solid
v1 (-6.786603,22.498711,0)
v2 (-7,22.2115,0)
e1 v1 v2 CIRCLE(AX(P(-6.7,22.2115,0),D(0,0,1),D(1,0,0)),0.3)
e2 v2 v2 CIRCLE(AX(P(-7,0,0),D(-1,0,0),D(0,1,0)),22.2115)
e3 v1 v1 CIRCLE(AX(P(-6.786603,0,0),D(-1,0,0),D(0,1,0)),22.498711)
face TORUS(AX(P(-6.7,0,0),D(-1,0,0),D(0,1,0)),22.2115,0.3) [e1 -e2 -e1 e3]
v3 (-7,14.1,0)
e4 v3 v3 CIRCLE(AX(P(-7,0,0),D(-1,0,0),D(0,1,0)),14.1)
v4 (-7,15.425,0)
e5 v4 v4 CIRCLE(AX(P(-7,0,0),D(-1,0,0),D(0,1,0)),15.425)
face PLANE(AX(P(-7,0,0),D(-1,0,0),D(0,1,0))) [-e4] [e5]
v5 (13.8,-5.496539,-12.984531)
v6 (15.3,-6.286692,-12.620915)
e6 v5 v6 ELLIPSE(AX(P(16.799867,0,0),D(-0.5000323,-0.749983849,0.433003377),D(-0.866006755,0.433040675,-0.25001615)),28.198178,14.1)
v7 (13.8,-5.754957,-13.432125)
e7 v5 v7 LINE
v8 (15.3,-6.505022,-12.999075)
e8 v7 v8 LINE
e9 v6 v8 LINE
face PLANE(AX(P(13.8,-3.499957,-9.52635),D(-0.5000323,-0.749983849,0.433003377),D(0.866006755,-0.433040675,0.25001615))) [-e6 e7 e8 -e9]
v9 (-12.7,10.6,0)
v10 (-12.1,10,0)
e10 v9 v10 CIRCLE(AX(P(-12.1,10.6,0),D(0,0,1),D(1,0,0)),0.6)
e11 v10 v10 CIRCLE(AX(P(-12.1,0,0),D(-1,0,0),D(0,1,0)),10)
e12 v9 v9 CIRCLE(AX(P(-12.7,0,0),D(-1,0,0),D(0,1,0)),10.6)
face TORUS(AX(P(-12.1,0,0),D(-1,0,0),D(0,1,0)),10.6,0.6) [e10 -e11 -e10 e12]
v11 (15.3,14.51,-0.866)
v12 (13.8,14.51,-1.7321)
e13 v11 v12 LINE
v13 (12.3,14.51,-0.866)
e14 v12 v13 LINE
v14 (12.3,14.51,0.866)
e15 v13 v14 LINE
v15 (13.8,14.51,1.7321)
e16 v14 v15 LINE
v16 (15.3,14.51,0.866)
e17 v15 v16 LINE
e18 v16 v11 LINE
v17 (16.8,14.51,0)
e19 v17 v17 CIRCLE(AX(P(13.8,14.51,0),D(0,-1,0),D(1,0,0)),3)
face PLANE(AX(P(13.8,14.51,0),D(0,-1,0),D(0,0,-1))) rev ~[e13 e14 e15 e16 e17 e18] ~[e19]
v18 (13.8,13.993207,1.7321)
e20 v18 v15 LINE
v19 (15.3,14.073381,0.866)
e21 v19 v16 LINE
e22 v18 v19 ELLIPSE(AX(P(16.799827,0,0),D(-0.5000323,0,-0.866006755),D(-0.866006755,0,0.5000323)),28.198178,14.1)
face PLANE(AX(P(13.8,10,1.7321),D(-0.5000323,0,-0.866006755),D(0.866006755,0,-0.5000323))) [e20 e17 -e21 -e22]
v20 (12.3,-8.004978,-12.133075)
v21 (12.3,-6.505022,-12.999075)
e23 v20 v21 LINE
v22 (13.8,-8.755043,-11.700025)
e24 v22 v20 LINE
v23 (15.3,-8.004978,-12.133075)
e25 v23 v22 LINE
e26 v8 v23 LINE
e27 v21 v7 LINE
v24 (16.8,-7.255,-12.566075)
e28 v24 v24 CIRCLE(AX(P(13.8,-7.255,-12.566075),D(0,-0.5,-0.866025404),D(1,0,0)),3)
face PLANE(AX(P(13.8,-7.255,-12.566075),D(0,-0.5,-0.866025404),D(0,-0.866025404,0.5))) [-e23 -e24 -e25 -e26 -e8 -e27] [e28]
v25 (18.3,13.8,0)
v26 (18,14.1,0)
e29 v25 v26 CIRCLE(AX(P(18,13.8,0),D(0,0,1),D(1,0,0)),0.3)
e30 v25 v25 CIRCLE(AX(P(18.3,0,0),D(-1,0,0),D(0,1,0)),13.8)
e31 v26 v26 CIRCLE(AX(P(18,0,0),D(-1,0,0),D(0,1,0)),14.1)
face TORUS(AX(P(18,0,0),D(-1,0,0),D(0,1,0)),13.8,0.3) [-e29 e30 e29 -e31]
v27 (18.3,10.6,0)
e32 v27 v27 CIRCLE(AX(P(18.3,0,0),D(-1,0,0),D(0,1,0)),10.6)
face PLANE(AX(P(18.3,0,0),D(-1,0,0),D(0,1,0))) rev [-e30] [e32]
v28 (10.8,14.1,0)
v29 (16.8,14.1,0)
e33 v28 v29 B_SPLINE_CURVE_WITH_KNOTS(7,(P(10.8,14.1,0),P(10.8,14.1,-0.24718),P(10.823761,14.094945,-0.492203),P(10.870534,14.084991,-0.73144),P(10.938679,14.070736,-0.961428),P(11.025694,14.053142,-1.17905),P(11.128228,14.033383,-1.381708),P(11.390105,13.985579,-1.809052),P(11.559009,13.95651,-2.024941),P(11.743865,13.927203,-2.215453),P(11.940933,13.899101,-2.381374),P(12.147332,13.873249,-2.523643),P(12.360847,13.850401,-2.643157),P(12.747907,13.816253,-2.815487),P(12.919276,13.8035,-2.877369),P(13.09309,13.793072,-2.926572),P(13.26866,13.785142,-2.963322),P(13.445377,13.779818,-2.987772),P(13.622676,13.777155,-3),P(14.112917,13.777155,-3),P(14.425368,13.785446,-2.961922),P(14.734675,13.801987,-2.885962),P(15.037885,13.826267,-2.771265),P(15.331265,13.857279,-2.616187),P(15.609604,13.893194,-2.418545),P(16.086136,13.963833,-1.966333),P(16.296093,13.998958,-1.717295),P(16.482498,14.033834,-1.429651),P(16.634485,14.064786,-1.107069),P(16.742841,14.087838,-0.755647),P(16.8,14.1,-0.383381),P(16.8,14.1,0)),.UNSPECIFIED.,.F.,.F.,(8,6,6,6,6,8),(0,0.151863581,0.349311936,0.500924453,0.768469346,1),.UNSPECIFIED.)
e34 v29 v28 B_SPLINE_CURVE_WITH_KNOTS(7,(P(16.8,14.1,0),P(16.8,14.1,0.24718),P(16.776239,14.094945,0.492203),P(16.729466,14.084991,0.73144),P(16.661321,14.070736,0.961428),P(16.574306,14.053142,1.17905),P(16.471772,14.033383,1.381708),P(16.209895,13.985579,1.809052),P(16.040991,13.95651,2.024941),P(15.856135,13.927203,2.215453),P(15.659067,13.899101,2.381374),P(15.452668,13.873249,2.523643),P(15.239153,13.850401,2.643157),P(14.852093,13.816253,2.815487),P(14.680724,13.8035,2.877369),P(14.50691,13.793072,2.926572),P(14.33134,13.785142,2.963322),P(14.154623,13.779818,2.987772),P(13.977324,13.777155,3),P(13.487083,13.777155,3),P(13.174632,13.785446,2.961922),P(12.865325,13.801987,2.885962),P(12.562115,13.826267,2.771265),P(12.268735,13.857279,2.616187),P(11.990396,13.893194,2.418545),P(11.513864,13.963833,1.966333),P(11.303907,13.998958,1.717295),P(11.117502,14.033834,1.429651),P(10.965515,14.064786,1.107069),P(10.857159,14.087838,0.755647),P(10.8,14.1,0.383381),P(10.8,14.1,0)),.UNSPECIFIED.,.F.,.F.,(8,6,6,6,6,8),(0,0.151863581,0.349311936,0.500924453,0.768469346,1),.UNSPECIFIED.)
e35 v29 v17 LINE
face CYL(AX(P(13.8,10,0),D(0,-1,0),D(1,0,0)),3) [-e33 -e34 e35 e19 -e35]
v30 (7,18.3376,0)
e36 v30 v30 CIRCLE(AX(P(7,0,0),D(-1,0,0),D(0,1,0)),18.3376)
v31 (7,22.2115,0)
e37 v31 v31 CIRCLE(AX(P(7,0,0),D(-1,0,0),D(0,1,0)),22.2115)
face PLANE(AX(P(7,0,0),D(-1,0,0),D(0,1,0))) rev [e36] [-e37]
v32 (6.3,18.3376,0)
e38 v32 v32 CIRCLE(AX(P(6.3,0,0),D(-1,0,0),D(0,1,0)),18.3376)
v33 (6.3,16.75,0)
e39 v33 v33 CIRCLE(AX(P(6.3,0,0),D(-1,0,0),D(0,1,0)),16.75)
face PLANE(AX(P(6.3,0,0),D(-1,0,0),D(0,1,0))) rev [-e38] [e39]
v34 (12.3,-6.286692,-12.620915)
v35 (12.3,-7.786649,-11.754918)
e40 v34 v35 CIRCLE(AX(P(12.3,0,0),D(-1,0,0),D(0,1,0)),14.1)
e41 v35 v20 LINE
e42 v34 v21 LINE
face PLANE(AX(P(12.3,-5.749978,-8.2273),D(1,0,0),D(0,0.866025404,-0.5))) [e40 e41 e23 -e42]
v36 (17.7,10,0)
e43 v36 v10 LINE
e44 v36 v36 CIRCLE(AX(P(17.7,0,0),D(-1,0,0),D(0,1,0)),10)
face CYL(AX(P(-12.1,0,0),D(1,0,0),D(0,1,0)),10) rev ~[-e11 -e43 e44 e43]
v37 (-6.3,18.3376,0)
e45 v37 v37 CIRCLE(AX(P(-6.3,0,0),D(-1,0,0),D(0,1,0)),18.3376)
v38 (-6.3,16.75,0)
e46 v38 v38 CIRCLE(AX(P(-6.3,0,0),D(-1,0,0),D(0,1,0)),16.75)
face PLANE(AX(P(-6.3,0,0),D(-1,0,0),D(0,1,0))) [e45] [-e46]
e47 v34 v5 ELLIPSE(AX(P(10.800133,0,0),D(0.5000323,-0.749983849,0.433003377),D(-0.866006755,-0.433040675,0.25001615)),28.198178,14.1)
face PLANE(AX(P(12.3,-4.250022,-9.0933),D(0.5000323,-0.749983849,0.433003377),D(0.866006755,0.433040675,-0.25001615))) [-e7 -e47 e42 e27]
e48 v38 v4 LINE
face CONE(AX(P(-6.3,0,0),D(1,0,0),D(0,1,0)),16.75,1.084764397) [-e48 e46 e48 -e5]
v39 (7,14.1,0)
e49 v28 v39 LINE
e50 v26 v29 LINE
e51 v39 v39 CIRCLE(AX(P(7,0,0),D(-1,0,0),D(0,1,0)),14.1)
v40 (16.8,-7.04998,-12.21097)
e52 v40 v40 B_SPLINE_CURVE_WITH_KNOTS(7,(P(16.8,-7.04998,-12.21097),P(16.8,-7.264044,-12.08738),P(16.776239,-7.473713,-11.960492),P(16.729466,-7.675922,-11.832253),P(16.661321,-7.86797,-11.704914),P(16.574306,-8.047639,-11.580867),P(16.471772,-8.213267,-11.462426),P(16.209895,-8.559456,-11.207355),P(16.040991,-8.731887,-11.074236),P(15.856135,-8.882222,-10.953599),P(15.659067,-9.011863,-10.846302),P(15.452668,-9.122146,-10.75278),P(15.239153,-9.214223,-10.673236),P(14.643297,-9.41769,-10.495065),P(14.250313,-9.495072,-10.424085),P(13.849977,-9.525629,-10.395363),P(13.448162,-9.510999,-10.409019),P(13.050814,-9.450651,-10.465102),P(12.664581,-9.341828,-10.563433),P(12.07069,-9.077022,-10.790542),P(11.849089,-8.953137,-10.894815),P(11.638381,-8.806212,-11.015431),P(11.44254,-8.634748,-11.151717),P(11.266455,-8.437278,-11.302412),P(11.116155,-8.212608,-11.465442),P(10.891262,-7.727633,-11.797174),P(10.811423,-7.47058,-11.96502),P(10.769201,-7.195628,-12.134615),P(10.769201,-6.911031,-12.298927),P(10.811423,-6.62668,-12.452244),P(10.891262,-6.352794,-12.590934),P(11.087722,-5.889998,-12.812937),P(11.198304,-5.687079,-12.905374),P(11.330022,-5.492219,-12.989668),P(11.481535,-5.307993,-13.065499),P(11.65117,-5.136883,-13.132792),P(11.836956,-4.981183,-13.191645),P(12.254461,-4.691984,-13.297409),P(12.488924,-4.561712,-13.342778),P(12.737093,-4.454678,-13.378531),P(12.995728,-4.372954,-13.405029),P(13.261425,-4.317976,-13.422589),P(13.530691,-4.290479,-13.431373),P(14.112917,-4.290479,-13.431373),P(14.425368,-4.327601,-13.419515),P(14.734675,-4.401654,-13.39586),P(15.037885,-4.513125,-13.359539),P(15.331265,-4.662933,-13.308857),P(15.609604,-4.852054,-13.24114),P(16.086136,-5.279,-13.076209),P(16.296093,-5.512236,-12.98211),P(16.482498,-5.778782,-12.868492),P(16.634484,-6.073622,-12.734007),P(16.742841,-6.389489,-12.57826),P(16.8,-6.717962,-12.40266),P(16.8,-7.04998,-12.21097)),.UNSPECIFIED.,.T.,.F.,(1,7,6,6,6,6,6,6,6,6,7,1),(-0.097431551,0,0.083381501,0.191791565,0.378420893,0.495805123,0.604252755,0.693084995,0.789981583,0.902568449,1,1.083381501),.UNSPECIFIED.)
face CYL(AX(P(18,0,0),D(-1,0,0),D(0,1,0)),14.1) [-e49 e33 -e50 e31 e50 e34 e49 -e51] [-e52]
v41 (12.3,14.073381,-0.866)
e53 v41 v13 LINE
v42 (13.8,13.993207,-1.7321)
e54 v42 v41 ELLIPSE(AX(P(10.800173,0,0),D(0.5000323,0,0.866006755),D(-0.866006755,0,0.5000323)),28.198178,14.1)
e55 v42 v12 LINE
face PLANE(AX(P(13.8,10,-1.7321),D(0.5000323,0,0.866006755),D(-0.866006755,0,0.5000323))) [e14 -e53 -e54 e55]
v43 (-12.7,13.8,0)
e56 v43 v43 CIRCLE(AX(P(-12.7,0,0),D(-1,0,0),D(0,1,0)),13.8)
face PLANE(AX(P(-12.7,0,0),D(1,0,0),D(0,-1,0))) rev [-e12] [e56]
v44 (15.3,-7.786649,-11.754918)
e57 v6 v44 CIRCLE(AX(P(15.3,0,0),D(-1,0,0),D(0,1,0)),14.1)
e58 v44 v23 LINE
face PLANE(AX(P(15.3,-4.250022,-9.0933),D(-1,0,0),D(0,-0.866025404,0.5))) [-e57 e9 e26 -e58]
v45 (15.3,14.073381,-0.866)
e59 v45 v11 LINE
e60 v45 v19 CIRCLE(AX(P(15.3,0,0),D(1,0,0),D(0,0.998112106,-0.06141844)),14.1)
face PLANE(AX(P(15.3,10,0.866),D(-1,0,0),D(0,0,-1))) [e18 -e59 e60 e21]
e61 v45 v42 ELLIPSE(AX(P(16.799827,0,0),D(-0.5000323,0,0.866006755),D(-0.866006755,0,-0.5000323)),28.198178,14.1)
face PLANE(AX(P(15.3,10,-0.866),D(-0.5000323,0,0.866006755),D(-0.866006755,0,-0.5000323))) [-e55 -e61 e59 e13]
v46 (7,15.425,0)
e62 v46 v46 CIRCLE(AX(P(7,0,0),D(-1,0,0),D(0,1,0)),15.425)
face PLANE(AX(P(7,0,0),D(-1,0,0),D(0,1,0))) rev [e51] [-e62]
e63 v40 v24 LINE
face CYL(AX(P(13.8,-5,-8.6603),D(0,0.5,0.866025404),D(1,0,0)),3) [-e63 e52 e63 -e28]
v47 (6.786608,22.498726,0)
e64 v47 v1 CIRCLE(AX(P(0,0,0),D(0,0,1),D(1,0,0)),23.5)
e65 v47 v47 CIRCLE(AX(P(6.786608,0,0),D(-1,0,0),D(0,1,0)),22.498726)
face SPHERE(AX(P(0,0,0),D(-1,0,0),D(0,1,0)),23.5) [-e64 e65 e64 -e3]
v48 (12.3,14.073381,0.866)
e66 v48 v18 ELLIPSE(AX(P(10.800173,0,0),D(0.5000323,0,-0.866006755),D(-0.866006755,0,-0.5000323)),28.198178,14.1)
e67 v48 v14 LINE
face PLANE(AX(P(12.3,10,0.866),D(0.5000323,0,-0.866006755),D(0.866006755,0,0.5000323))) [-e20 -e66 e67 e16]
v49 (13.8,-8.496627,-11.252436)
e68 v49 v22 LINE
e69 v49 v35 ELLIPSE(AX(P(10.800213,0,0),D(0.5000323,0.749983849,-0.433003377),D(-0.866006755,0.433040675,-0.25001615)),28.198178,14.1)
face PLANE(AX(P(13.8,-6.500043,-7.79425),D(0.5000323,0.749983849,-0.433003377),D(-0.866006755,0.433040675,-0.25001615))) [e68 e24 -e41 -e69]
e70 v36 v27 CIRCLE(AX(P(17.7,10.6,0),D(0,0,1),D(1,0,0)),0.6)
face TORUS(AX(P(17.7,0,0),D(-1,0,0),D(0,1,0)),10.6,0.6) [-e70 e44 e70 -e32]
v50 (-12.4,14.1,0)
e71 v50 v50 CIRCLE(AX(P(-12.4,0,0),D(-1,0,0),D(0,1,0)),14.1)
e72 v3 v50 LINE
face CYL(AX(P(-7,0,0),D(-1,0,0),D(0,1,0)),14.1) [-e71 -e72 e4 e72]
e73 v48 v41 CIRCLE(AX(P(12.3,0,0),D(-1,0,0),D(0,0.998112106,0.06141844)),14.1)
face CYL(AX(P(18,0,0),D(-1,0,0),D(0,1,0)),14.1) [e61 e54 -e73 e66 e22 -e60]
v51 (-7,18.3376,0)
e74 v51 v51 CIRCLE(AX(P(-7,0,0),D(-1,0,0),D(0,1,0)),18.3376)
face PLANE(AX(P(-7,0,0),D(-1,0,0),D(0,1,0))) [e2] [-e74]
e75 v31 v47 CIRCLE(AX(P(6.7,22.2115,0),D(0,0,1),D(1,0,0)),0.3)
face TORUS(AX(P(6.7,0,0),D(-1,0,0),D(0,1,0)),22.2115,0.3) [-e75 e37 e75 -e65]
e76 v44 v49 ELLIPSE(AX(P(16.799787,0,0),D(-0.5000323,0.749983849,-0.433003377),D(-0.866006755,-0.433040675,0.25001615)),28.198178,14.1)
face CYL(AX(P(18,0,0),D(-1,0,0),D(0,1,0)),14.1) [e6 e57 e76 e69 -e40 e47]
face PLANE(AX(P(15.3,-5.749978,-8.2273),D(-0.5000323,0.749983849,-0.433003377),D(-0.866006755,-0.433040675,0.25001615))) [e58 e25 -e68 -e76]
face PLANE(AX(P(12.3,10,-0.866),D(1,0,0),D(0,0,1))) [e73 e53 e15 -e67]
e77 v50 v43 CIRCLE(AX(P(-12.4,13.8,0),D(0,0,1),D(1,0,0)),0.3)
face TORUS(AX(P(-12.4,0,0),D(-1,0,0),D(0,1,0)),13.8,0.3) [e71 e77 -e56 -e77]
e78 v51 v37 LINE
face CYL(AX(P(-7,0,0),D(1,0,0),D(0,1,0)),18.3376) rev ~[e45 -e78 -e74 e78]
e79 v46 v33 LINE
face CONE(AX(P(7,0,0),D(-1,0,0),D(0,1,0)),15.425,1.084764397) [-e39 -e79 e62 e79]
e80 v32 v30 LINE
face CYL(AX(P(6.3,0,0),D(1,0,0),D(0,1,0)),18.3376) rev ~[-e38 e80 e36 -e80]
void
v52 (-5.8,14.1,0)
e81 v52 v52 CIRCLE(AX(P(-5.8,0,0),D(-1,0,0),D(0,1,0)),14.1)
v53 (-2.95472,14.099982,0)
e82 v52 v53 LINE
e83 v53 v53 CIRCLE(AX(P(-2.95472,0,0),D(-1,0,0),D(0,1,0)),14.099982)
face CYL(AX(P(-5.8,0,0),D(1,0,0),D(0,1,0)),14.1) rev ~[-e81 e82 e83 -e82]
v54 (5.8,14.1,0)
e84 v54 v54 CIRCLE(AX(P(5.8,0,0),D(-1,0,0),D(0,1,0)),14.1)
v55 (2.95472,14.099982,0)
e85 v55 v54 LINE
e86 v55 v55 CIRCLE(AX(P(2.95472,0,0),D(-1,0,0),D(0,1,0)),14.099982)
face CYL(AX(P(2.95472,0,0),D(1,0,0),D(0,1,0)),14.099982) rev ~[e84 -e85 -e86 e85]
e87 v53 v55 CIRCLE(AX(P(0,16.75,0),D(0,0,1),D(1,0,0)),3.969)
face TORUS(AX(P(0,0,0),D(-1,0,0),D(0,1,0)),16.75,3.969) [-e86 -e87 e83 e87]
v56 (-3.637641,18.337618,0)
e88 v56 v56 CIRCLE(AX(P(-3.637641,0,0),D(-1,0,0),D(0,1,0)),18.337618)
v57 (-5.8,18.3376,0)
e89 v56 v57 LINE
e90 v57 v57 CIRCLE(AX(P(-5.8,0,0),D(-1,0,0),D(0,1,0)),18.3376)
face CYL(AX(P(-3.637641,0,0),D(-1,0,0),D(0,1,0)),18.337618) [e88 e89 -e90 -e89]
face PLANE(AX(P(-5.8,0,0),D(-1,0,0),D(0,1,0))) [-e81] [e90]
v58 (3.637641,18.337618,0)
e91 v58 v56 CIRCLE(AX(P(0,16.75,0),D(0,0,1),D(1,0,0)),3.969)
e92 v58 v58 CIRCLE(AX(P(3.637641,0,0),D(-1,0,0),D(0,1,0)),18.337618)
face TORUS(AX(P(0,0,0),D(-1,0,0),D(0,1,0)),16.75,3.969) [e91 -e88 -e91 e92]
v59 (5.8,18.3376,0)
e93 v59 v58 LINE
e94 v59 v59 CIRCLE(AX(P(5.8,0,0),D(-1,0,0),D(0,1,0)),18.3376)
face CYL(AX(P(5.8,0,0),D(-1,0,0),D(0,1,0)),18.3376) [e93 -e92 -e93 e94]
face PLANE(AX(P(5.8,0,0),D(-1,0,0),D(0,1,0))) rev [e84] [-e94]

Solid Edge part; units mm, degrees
sketch "Sketch1" plane through (0, 10, 0) normal (0, -1, 0) x (1, 0, 0)
  circle A0 centre (13.8, 0) radius 3
  line L0 (12.3, -0.866) -> (12.3, 0.866)
  line L1 (12.3, 0.866) -> (13.8, 1.7321)
  line L2 (13.8, 1.7321) -> (15.3, 0.866)
  line L3 (15.3, 0.866) -> (15.3, -0.866)
  line L4 (15.3, -0.866) -> (13.8, -1.7321)
  line L5 (13.8, -1.7321) -> (12.3, -0.866)
extrude "ExtrudedProtrusion_1" add sketch "Sketch1" against normal blind 4.51
sketch "Sketch2" plane through (0, 0, 0) normal (0, 0, 1) x (1, 0, 0)
  arc A0 (-12.7, 10.6) -> (-12.1, 10) centre (-12.1, 10.6) ccw
  line L0 (-12.1, 10) -> (17.7, 10)
  arc A1 (17.7, 10) -> (18.3, 10.6) centre (17.7, 10.6) ccw
  line L1 (18.3, 10.6) -> (18.3, 13.8)
  arc A2 (18.3, 13.8) -> (18, 14.1) centre (18, 13.8) ccw
  line L2 (18, 14.1) -> (7, 14.1)
  line L3 (7, 14.1) -> (7, 15.425)
  line L4 (7, 15.425) -> (6.3, 16.75)
  line L5 (6.3, 16.75) -> (6.3, 18.3376)
  line L6 (6.3, 18.3376) -> (7, 18.3376)
  line L7 (7, 18.3376) -> (7, 22.2115)
  arc A3 (7, 22.2115) -> (6.7866, 22.4987) centre (6.7, 22.2115) ccw
  arc A4 (6.7866, 22.4987) -> (-6.7866, 22.4987) centre (0, 0) ccw
  arc A5 (-6.7866, 22.4987) -> (-7, 22.2115) centre (-6.7, 22.2115) ccw
  line L8 (-7, 22.2115) -> (-7, 18.3376)
  line L9 (-7, 18.3376) -> (-6.3, 18.3376)
  line L10 (-6.3, 18.3376) -> (-6.3, 16.75)
  line L11 (-6.3, 16.75) -> (-7, 15.425)
  line L12 (-7, 15.425) -> (-7, 14.1)
  line L13 (-7, 14.1) -> (-12.4, 14.1)
  arc A6 (-12.4, 14.1) -> (-12.7, 13.8) centre (-12.4, 13.8) ccw
  line L14 (-12.7, 13.8) -> (-12.7, 10.6)
  line L15 (-5.8, 14.1) -> (-2.9547, 14.1)
  arc A7 (-2.9547, 14.1) -> (2.9547, 14.1) centre (0, 16.75) ccw
  line L16 (2.9547, 14.1) -> (5.8, 14.1)
  line L17 (5.8, 14.1) -> (5.8, 18.3376)
  line L18 (5.8, 18.3376) -> (3.6376, 18.3376)
  arc A8 (3.6376, 18.3376) -> (-3.6376, 18.3376) centre (0, 16.75) ccw
  line L19 (-3.6376, 18.3376) -> (-5.8, 18.3376)
  line L20 (-5.8, 18.3376) -> (-5.8, 14.1)
revolve "RevolvedProtrusion1" add sketch "Sketch2" angle 360 about axis through (18.3, 0, 0) along (-1, 0, 0)
sketch "Sketch3" plane through (0, -5, -8.6603) normal (0, -0.5, -0.8660254) x (1, 0, 0)
  circle A0 centre (13.8, 0) radius 3
  line L0 (12.3, 0.866) -> (12.3, -0.866)
  line L1 (12.3, -0.866) -> (13.8, -1.7321)
  line L2 (13.8, -1.7321) -> (15.3, -0.866)
  line L3 (15.3, -0.866) -> (15.3, 0.866)
  line L4 (15.3, 0.866) -> (13.8, 1.7321)
  line L5 (13.8, 1.7321) -> (12.3, 0.866)
extrude "ExtrudedProtrusion_2" add sketch "Sketch3" along normal blind 4.51
properties material "Aluminum, 6061-T6"
